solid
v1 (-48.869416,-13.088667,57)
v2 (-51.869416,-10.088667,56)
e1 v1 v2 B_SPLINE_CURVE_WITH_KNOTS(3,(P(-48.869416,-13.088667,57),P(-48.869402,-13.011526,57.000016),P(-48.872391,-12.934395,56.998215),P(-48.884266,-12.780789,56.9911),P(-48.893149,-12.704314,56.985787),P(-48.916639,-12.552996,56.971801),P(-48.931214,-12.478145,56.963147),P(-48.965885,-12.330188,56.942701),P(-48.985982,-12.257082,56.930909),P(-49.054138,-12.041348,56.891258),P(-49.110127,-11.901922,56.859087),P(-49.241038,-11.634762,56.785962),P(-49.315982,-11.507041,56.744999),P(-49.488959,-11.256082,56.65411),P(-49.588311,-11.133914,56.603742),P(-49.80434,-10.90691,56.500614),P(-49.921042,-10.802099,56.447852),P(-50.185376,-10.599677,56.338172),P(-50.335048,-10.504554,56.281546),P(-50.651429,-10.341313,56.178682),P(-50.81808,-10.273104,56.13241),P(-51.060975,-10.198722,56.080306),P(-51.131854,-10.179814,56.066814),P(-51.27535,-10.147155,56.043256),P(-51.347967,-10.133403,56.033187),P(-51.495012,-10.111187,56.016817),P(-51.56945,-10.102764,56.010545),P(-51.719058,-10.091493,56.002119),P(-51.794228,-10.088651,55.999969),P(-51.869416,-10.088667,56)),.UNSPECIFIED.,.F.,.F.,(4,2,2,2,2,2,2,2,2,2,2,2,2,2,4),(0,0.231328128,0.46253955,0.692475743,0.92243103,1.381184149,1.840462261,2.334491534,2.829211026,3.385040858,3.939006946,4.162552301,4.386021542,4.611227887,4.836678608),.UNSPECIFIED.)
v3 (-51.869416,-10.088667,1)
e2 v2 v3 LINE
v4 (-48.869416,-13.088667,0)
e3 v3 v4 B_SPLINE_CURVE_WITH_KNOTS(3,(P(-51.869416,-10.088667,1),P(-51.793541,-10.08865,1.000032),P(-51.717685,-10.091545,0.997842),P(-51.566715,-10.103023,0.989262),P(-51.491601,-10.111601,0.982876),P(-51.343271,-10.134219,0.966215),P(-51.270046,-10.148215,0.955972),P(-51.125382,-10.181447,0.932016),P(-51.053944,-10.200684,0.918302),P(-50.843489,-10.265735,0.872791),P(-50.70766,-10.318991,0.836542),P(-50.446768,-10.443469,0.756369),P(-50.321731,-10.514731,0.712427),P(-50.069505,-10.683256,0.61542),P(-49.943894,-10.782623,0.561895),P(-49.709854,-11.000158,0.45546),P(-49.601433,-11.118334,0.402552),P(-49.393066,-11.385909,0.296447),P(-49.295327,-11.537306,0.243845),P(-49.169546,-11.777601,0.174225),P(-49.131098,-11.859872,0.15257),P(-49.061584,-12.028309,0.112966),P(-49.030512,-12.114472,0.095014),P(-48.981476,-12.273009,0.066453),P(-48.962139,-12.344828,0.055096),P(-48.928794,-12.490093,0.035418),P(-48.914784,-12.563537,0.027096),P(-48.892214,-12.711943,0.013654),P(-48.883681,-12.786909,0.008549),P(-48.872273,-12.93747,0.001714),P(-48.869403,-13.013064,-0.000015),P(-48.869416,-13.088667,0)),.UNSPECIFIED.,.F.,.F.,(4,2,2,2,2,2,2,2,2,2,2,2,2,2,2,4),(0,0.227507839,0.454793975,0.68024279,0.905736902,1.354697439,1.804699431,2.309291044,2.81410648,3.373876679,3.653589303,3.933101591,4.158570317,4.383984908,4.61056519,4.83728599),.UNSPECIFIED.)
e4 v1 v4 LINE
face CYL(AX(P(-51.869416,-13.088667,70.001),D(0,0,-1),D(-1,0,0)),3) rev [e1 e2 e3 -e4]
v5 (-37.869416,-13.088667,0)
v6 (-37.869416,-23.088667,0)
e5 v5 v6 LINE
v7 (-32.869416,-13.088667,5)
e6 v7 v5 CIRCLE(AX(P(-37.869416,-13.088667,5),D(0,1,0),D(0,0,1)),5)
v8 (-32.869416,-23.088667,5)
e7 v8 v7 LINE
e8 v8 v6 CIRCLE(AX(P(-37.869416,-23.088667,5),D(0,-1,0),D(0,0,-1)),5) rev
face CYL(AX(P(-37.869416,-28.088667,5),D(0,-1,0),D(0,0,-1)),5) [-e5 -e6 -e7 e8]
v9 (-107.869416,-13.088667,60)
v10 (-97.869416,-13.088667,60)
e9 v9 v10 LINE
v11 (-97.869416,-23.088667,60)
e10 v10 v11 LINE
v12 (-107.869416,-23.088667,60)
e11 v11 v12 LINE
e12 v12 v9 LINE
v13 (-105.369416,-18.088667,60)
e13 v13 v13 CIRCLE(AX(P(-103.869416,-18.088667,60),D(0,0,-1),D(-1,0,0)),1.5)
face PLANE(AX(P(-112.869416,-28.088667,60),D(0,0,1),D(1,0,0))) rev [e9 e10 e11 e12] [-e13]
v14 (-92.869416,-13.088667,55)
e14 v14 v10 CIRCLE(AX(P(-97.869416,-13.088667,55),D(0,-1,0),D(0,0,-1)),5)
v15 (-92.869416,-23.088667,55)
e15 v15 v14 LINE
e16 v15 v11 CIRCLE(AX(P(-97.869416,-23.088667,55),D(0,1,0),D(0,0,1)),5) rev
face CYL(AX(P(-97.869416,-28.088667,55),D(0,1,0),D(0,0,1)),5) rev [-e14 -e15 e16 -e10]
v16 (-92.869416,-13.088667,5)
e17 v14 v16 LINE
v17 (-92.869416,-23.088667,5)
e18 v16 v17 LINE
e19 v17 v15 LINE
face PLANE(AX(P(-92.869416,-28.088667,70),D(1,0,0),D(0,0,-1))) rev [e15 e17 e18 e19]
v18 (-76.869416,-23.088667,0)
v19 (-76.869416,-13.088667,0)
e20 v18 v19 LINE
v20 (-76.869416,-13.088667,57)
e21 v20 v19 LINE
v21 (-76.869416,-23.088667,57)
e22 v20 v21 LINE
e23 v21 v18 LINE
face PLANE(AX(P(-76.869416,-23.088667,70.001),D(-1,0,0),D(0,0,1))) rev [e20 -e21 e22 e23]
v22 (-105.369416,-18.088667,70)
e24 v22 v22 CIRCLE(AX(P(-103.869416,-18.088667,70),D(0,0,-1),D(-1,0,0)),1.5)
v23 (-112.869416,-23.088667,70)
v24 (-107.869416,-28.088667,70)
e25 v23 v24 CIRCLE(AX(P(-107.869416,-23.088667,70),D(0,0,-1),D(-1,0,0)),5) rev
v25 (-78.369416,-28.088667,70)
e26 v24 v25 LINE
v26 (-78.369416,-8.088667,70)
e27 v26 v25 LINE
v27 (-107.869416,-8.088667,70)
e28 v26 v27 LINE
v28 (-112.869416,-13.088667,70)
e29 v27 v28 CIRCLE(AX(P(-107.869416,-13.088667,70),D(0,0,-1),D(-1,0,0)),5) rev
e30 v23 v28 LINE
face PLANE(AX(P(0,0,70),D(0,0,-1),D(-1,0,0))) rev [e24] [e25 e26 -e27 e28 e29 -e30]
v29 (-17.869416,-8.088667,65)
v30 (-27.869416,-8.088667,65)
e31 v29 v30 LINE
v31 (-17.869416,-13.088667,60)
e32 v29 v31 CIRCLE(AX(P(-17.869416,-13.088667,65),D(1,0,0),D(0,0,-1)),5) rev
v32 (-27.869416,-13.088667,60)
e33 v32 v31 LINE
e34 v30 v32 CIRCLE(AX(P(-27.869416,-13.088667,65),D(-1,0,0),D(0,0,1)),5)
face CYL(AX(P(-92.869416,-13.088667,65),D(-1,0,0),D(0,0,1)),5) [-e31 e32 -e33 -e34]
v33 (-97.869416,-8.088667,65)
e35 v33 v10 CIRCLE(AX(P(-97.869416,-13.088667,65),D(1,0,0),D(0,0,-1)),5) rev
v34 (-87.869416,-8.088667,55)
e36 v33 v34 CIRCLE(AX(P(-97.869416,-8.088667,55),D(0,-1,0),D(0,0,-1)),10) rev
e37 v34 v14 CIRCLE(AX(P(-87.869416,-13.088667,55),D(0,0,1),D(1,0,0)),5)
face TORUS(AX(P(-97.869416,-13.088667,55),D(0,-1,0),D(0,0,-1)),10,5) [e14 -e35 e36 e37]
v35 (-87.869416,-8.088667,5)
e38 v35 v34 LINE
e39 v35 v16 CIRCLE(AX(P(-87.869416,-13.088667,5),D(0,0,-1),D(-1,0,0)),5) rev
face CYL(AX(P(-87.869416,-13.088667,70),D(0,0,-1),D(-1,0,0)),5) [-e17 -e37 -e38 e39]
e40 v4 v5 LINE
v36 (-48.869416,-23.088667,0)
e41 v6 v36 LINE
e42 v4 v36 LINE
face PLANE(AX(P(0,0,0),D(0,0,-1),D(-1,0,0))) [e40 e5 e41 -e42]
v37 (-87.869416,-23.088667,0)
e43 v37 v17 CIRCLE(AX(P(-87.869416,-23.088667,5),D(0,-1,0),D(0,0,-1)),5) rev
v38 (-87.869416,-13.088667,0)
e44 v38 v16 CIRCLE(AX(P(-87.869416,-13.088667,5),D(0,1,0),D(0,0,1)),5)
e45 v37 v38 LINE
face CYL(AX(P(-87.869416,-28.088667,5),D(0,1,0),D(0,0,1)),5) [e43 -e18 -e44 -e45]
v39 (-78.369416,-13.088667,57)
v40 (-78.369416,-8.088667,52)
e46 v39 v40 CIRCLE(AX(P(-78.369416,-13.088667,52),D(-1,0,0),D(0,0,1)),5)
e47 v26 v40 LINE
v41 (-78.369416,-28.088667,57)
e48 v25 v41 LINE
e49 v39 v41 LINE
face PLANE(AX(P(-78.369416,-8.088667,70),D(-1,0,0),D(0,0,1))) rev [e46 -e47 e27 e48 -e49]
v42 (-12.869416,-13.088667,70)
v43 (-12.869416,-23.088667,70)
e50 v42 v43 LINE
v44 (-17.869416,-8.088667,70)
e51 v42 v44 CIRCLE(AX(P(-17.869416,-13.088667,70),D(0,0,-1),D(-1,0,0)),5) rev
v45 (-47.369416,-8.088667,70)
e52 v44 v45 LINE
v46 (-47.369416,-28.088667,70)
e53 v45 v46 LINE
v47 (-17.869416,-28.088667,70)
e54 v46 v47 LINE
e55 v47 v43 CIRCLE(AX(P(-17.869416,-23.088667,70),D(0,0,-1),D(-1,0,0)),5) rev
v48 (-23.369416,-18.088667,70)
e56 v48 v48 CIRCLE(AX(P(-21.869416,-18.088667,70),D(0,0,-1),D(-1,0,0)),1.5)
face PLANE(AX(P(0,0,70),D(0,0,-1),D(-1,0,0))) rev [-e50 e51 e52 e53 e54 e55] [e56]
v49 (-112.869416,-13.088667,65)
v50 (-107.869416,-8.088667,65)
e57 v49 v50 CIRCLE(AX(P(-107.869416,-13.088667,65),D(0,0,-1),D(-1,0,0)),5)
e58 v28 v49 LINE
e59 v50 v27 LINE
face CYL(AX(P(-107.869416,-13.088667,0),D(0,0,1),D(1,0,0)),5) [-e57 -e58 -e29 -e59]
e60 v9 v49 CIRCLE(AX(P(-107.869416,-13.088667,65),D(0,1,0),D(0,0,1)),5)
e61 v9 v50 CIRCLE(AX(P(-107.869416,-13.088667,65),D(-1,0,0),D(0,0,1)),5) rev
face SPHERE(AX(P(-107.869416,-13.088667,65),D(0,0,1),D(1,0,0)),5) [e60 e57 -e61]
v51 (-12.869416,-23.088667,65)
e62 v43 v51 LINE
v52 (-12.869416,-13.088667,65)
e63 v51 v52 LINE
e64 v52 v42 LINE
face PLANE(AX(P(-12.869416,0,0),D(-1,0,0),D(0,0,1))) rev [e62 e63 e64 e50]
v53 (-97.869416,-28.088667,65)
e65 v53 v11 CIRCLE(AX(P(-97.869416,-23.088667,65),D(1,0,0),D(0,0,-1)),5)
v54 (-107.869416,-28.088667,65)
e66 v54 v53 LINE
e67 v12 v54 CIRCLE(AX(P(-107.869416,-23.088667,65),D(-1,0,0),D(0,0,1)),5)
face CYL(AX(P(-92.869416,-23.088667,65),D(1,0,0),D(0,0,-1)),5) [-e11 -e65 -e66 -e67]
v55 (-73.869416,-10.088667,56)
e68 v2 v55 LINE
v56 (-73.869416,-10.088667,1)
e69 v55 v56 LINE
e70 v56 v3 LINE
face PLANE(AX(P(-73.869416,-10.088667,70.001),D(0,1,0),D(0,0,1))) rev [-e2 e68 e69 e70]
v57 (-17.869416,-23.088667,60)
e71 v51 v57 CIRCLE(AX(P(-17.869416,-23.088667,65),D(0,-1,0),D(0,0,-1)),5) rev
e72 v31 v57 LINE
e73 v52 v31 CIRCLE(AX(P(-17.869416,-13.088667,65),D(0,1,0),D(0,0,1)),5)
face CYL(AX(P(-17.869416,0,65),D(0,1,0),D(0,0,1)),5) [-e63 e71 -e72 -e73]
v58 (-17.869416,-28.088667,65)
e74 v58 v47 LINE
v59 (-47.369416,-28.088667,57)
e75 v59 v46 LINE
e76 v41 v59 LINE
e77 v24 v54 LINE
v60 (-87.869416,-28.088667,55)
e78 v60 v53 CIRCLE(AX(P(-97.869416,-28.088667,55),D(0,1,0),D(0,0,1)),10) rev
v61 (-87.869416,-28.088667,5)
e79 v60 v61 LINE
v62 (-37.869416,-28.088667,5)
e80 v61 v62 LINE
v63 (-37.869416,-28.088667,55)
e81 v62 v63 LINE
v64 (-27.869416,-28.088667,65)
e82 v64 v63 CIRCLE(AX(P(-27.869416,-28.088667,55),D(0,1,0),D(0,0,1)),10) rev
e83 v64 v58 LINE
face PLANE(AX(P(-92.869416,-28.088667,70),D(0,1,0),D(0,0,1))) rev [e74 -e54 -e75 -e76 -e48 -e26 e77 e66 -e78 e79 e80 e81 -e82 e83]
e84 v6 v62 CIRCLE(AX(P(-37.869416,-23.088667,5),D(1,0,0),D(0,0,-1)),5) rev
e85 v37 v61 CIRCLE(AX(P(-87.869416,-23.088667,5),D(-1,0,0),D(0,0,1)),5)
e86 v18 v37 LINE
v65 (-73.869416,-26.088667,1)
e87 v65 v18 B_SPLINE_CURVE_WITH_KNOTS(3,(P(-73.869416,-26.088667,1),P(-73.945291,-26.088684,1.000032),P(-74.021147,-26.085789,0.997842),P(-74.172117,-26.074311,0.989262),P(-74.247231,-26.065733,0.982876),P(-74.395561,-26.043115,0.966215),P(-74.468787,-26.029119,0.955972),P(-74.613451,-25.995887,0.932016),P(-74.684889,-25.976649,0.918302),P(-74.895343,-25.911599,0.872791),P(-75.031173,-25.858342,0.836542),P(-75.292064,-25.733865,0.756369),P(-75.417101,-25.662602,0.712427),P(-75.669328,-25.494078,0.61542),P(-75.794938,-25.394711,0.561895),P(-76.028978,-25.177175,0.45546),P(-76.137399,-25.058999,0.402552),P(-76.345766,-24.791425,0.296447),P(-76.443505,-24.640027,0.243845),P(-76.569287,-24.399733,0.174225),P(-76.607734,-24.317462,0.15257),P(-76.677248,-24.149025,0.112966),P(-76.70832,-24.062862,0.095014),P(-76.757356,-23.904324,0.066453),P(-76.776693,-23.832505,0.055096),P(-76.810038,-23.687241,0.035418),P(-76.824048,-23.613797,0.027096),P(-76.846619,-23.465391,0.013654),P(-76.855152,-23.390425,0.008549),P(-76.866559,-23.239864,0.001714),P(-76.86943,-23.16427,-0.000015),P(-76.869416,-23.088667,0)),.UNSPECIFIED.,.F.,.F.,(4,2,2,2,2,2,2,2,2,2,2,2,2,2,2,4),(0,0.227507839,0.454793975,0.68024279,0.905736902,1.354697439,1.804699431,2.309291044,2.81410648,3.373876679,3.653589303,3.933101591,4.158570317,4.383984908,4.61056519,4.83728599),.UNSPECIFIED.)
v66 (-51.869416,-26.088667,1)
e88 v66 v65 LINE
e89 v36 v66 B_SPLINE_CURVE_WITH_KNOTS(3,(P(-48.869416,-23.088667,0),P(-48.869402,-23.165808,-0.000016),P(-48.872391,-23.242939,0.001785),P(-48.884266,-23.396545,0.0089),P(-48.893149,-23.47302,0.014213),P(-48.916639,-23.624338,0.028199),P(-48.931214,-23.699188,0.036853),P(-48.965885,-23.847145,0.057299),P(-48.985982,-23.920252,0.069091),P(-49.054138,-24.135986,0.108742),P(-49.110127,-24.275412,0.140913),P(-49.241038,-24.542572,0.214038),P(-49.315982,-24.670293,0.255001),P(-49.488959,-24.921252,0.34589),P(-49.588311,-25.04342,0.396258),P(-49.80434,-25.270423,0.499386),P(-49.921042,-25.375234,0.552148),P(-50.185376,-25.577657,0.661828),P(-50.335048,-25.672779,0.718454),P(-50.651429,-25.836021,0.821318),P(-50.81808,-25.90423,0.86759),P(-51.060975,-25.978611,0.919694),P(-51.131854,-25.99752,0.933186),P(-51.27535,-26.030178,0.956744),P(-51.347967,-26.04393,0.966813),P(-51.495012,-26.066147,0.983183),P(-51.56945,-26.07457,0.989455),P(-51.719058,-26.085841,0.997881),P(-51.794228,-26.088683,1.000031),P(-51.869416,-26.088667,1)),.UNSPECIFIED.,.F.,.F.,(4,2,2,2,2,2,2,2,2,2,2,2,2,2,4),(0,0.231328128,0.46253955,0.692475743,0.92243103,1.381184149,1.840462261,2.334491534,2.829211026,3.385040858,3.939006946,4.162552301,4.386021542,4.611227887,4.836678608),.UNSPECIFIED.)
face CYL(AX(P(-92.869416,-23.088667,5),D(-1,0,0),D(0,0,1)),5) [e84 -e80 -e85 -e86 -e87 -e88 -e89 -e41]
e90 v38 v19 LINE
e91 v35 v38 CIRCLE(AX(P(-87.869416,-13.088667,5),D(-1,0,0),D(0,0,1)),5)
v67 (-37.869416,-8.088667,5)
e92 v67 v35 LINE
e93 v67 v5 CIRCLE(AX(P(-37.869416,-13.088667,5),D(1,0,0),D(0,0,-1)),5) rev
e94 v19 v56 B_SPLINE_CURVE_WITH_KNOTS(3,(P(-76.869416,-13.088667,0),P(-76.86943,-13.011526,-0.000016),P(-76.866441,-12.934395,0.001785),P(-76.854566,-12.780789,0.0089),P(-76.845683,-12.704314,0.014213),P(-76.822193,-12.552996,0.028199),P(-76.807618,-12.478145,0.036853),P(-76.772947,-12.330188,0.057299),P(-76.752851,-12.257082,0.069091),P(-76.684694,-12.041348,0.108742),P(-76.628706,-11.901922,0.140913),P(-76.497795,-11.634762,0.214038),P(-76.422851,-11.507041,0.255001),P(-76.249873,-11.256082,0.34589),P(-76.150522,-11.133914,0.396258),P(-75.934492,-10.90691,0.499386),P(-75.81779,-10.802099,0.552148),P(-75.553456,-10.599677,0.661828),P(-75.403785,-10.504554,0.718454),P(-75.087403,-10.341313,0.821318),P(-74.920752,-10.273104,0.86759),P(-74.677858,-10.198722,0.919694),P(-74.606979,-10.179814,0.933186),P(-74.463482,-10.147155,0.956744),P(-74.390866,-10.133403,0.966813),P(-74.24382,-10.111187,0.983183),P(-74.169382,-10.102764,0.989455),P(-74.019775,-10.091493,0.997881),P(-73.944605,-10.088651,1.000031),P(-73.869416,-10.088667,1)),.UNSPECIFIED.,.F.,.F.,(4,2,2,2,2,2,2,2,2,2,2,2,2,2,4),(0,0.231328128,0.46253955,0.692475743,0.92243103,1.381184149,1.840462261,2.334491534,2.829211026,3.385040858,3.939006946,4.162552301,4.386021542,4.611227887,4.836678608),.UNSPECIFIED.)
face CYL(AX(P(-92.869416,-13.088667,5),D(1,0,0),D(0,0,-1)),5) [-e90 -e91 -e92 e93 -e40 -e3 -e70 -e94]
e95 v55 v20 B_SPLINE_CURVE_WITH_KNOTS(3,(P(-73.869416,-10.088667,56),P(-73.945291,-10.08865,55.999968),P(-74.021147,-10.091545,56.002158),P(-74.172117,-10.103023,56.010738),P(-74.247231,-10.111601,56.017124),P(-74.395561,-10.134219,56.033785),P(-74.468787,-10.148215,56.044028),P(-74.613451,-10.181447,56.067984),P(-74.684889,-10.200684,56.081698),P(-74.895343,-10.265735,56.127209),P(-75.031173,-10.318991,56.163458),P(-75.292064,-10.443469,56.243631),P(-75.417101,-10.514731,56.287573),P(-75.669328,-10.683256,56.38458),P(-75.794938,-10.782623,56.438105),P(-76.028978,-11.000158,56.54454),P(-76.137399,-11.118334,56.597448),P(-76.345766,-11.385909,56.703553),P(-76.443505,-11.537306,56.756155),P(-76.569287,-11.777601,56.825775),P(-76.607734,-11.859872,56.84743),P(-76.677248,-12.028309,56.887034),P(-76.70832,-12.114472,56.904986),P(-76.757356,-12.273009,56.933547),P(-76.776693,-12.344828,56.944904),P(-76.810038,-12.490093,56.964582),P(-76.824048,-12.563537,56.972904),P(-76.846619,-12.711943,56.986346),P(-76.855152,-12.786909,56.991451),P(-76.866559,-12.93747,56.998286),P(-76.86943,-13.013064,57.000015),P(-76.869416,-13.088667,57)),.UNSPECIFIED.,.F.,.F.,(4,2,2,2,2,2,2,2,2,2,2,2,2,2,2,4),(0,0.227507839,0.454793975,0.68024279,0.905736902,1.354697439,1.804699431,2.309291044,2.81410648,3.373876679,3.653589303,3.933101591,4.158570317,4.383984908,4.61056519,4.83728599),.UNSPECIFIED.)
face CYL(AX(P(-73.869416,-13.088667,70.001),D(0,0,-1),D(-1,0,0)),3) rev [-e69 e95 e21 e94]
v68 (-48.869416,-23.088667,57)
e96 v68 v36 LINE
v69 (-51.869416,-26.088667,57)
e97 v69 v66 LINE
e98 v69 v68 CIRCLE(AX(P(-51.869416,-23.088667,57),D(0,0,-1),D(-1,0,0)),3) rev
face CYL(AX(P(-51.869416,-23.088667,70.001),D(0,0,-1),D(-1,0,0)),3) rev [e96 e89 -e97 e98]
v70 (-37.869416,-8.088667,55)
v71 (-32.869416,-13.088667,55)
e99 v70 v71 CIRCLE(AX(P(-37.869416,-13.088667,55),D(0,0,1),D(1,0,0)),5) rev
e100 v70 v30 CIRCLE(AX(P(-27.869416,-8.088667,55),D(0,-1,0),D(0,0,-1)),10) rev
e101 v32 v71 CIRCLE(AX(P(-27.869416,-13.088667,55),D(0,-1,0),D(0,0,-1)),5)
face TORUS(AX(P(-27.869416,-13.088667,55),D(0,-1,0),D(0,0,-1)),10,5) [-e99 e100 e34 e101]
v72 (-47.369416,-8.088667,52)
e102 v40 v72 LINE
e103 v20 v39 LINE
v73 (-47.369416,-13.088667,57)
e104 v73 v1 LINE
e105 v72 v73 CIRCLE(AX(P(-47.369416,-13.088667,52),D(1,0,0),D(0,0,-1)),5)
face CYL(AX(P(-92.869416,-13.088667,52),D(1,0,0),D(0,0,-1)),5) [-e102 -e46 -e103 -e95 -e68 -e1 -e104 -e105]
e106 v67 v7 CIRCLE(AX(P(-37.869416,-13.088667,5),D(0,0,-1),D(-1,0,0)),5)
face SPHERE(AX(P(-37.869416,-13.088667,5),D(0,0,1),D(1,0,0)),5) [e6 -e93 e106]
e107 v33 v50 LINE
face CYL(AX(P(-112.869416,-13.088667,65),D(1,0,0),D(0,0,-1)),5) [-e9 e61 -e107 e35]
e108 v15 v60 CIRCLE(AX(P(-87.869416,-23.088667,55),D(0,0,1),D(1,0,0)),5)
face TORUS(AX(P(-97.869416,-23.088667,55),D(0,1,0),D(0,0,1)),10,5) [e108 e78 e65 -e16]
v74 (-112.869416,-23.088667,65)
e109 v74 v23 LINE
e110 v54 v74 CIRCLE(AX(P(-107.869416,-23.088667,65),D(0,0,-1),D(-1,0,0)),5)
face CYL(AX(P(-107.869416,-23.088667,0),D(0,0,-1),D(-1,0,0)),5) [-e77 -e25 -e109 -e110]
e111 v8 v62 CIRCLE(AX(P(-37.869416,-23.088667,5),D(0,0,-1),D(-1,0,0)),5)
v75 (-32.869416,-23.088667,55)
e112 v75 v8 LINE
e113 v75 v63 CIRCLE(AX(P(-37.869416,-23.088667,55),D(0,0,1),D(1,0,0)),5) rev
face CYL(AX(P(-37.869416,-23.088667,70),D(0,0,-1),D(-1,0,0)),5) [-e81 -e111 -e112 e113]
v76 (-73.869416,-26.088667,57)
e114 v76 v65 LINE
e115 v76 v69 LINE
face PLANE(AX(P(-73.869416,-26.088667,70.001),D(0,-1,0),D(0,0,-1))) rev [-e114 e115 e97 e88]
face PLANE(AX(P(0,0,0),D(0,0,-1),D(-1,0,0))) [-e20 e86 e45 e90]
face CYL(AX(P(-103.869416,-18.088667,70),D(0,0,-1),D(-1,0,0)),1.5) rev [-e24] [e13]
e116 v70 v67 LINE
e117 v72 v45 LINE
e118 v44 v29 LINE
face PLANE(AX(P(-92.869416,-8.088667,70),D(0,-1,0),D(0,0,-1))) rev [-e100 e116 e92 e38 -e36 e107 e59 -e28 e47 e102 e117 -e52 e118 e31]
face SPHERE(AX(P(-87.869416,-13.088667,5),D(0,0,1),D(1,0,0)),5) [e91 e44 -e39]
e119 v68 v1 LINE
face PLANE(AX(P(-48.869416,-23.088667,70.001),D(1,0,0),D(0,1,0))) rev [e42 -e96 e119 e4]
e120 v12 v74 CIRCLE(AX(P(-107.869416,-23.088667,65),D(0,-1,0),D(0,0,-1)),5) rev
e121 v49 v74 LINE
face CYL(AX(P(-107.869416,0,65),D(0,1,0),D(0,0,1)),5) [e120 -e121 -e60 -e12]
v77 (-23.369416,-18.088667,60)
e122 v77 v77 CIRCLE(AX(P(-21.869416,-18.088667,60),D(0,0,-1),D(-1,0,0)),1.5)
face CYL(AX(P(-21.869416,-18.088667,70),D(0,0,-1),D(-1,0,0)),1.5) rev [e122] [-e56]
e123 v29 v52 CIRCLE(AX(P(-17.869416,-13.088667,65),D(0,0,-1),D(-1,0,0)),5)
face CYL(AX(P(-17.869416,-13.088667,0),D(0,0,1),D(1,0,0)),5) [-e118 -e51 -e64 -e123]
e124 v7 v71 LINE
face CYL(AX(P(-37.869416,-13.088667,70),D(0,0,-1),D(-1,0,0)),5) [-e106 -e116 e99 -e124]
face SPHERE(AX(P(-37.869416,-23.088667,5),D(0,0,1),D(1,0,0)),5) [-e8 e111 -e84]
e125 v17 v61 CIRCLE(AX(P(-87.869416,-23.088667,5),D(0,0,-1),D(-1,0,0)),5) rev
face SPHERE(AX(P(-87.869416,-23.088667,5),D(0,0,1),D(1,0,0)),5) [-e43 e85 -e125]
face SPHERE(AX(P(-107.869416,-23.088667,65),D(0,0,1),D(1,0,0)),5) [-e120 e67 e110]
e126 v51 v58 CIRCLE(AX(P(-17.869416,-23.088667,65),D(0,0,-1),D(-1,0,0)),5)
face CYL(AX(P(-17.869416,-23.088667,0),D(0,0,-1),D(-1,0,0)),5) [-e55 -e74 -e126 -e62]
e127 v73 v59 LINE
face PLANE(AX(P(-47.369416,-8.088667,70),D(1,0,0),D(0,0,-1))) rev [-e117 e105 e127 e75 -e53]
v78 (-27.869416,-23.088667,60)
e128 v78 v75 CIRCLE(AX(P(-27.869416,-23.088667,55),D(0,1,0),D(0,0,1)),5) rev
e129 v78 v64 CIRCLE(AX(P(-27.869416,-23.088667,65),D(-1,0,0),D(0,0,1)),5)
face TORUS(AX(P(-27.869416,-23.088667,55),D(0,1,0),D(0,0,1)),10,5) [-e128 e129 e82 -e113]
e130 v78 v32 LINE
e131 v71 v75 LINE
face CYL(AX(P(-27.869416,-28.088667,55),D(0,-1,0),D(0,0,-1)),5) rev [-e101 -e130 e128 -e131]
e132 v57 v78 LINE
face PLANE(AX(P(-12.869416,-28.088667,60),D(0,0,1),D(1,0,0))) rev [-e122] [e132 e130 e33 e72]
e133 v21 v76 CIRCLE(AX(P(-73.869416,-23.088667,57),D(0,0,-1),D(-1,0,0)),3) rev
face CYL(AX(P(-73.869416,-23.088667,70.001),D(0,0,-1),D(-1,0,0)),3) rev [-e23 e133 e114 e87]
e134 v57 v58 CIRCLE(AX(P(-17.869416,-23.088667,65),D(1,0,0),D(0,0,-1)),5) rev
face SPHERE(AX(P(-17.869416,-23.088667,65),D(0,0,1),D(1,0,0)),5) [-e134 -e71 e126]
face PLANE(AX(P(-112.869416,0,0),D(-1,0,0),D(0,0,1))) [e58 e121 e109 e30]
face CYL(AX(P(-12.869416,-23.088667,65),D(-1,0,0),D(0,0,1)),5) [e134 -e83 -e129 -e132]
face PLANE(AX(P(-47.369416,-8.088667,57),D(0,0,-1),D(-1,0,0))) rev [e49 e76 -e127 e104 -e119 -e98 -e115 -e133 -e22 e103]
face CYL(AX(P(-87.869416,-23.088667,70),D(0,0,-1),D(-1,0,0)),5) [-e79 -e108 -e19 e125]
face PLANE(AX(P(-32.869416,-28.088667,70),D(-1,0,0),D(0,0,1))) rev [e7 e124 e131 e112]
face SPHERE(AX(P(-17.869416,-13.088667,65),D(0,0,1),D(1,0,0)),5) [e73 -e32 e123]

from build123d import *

# Parameters (mm, degrees)
ESBO_O1_W                = 60
ESBO_O1_H                = 20
RESSALTO_EXTRUS_O1_DEPTH = 70
ESBO_O4_W                = 31
ESBO_O4_H                = 13
CORTE_EXTRUS_O2_DEPTH    = 119.003086654
ESBO_O6_W                = 10
ESBO_O6_H                = 20
RESSALTO_EXTRUS_O2_DEPTH = 20
ESBO_O5_W                = 10
ESBO_O5_H                = 20
RESSALTO_EXTRUS_O3_DEPTH = 20
CORTE_EXTRUS_O4_REACH    = 137.752
FILETE1_R                = 5
ESBO_O8_R                = 1.5
CORTE_EXTRUS_O5_DEPTH    = 131.875812627
FILETE2_R                = 5


with BuildPart() as part:
    # Esboço1 → Ressalto-extrusão1 (new body)
    with BuildSketch(Plane.XY):
        with Locations((-62.86941617, -18.088666872)):
            Rectangle(ESBO_O1_W, ESBO_O1_H)
    extrude(amount=RESSALTO_EXTRUS_O1_DEPTH)

    # Esboço4 → Corte-extrusão2 (cut, through all)
    with BuildSketch(Plane(origin=(0, -28.088666872, 0), x_dir=(-1, 0, 0), z_dir=(0, -1, 0))):
        with Locations((62.86941617, -63.5)):
            Rectangle(ESBO_O4_W, ESBO_O4_H)
    extrude(amount=-CORTE_EXTRUS_O2_DEPTH, mode=Mode.SUBTRACT)

    # Esboço6 → Ressalto-extrusão2 (add)
    with BuildSketch(Plane.ZY.offset(92.86941617)):
        with Locations((65, -18.088666872)):
            Rectangle(ESBO_O6_W, ESBO_O6_H)
    extrude(amount=RESSALTO_EXTRUS_O2_DEPTH)

    # Esboço5 → Ressalto-extrusão3 (add)
    with BuildSketch(Plane(origin=(-32.86941617, 0, 0), x_dir=(0, 0, -1), z_dir=(1, 0, 0))):
        with Locations((-65, -18.088666872)):
            Rectangle(ESBO_O5_W, ESBO_O5_H)
    extrude(amount=RESSALTO_EXTRUS_O3_DEPTH)

    # Esboço7 → Corte-extrusão4 (cut, up to next)
    with BuildSketch(Plane(origin=(0, 0, 0), x_dir=(-1, 0, 0), z_dir=(0, 0, -1)), mode=Mode.PRIVATE) as corte_extrus_o4_sk1:
        with BuildLine():
            Line((73.86941617, -26.088666872), (51.86941617, -26.088666872))
            ThreePointArc((51.86941617, -26.088666872), (49.748095827, -25.209987216), (48.86941617, -23.088666872))
            Line((48.86941617, -23.088666872), (48.86941617, -13.088666872))
            ThreePointArc((48.86941617, -13.088666872), (49.748095827, -10.967346529), (51.86941617, -10.088666872))
            Line((51.86941617, -10.088666872), (73.86941617, -10.088666872))
            ThreePointArc((73.86941617, -10.088666872), (75.990736514, -10.967346529), (76.86941617, -13.088666872))
            Line((76.86941617, -13.088666872), (76.86941617, -23.088666872))
            ThreePointArc((76.86941617, -23.088666872), (75.990736514, -25.209987216), (73.86941617, -26.088666872))
        make_face()
    corte_extrus_o4_tool1 = extrude(corte_extrus_o4_sk1.sketch, amount=-CORTE_EXTRUS_O4_REACH, mode=Mode.PRIVATE) & part.part
    add(corte_extrus_o4_tool1.solids().sort_by_distance((-62.869416, -18.088667, 0))[0], mode=Mode.SUBTRACT)

    # Filete1
    # the kernel refuses this fillet: 5 mm, written as the material it adds along each edge
    with BuildSketch(Plane(origin=(-92.86941617, -28.088666872, 60), x_dir=(0, 0, -1), z_dir=(0, 1, 0)), Plane(origin=(-32.86941617, -28.088666872, 60), x_dir=(1, 0, 0), z_dir=(0, 1, 0))) as filete1_piece_1:
        with BuildLine():
            CenterArc((FILETE1_R, FILETE1_R), FILETE1_R, 180, 90)
            Line((0, FILETE1_R), (0, 0))
            Line((0, 0), (FILETE1_R, 0))
        make_face()
    extrude(amount=20)
    # the kernel refuses this fillet: 5 mm, written as the material it takes off along each edge
    with BuildSketch(Plane(origin=(-12.86941617, -8.088666872, 47.5), x_dir=(0, -1, 0), z_dir=(0, 0, 1)), Plane(origin=(-112.86941617, -28.088666872, 82.5), x_dir=(1, 0, 0), z_dir=(0, 0, -1))) as filete1_2_piece_1:
        with BuildLine():
            CenterArc((FILETE1_R, -FILETE1_R), FILETE1_R, 90, 90)
            Line((0, -FILETE1_R), (0, 0))
            Line((0, 0), (FILETE1_R, 0))
        make_face()
    extrude(amount=35, mode=Mode.SUBTRACT)
    with BuildSketch(Plane(origin=(-112.86941617, -8.088666872, 47.5), x_dir=(0, -1, 0), z_dir=(0, 0, 1)), Plane(origin=(-12.86941617, -28.088666872, 82.5), x_dir=(-1, 0, 0), z_dir=(0, 0, -1))) as filete1_2_piece_2:
        with BuildLine():
            CenterArc((FILETE1_R, FILETE1_R), FILETE1_R, 180, 90)
            Line((0, FILETE1_R), (0, 0))
            Line((0, 0), (FILETE1_R, 0))
        make_face()
    extrude(amount=35, mode=Mode.SUBTRACT)
    with BuildSketch(Plane(origin=(-112.86941617, -40.588666872, 60), x_dir=(1, 0, 0), z_dir=(0, 1, 0)), Plane(origin=(-12.86941617, -40.588666872, 60), x_dir=(0, 0, 1), z_dir=(0, 1, 0))) as filete1_2_piece_3:
        with BuildLine():
            CenterArc((FILETE1_R, -FILETE1_R), FILETE1_R, 90, 90)
            Line((0, -FILETE1_R), (0, 0))
            Line((0, 0), (FILETE1_R, 0))
        make_face()
    extrude(amount=45, mode=Mode.SUBTRACT)
    with BuildSketch(Plane(origin=(-105.36941617, -28.088666872, 0), x_dir=(0, 0, 1), z_dir=(1, 0, 0))) as filete1_2_piece_4:
        with BuildLine():
            CenterArc((FILETE1_R, -FILETE1_R), FILETE1_R, 90, 90)
            Line((0, -FILETE1_R), (0, 0))
            Line((0, 0), (FILETE1_R, 0))
        make_face()
    extrude(amount=85, mode=Mode.SUBTRACT)
    with BuildSketch(Plane(origin=(-92.86941617, 4.411333128, 0), x_dir=(1, 0, 0), z_dir=(0, -1, 0)), Plane(origin=(-32.86941617, -40.588666872, 0), x_dir=(-1, 0, 0), z_dir=(0, 1, 0))) as filete1_2_piece_5:
        with BuildLine():
            CenterArc((FILETE1_R, FILETE1_R), FILETE1_R, 180, 90)
            Line((0, FILETE1_R), (0, 0))
            Line((0, 0), (FILETE1_R, 0))
        make_face()
    extrude(amount=45, mode=Mode.SUBTRACT)
    with BuildSketch(Plane(origin=(-20.36941617, -8.088666872, 0), x_dir=(0, -1, 0), z_dir=(-1, 0, 0))) as filete1_2_piece_6:
        with BuildLine():
            CenterArc((FILETE1_R, FILETE1_R), FILETE1_R, 180, 90)
            Line((0, FILETE1_R), (0, 0))
            Line((0, 0), (FILETE1_R, 0))
        make_face()
    extrude(amount=85, mode=Mode.SUBTRACT)
    # the kernel refuses this fillet: 5 mm, written as the material it takes off along each edge
    with BuildSketch(Plane(origin=(-87.86941617, -23.088666872, 5), x_dir=(-1, 0, 0), z_dir=(0, -1, 0))) as filete1_3_piece_1_section:
        Polygon((0, 0), (FILETE1_R, 0), (FILETE1_R, FILETE1_R), (0, FILETE1_R), align=None)
    filete1_3_piece_1 = extrude(amount=FILETE1_R, mode=Mode.PRIVATE)
    filete1_3_piece_1 = filete1_3_piece_1 - Plane(origin=(-87.86941617, -23.088666872, 5), x_dir=(0.7071067811865475, 0, 0.7071067811865475), z_dir=(0, -1, 0)) * Sphere(FILETE1_R, mode=Mode.PRIVATE)
    add(filete1_3_piece_1, mode=Mode.SUBTRACT)
    with BuildSketch(Plane(origin=(-87.86941617, -13.088666872, 5), x_dir=(0, 1, 0), z_dir=(-1, 0, 0))) as filete1_3_piece_2_section:
        Polygon((0, 0), (FILETE1_R, 0), (FILETE1_R, FILETE1_R), (0, FILETE1_R), align=None)
    filete1_3_piece_2 = extrude(amount=FILETE1_R, mode=Mode.PRIVATE)
    filete1_3_piece_2 = filete1_3_piece_2 - Plane(origin=(-87.86941617, -13.088666872, 5), x_dir=(0, -0.7071067811865475, 0.7071067811865475), z_dir=(-1, 0, 0)) * Sphere(FILETE1_R, mode=Mode.PRIVATE)
    add(filete1_3_piece_2, mode=Mode.SUBTRACT)
    with BuildSketch(Plane(origin=(-37.86941617, -13.088666872, 5), x_dir=(0, 1, 0), z_dir=(1, 0, 0))) as filete1_3_piece_3_section:
        Polygon((0, 0), (FILETE1_R, 0), (FILETE1_R, -FILETE1_R), (0, -FILETE1_R), align=None)
    filete1_3_piece_3 = extrude(amount=FILETE1_R, mode=Mode.PRIVATE)
    filete1_3_piece_3 = filete1_3_piece_3 - Plane(origin=(-37.86941617, -13.088666872, 5), x_dir=(0, -0.7071067811865475, 0.7071067811865475), z_dir=(1, 0, 0)) * Sphere(FILETE1_R, mode=Mode.PRIVATE)
    add(filete1_3_piece_3, mode=Mode.SUBTRACT)
    with BuildSketch(Plane(origin=(-37.86941617, -23.088666872, 5), x_dir=(1, 0, 0), z_dir=(0, -1, 0))) as filete1_3_piece_4_section:
        Polygon((0, 0), (FILETE1_R, 0), (FILETE1_R, -FILETE1_R), (0, -FILETE1_R), align=None)
    filete1_3_piece_4 = extrude(amount=FILETE1_R, mode=Mode.PRIVATE)
    filete1_3_piece_4 = filete1_3_piece_4 - Plane(origin=(-37.86941617, -23.088666872, 5), x_dir=(-0.7071067811865475, 0, 0.7071067811865475), z_dir=(0, -1, 0)) * Sphere(FILETE1_R, mode=Mode.PRIVATE)
    add(filete1_3_piece_4, mode=Mode.SUBTRACT)
    with BuildSketch(Plane(origin=(-107.86941617, -23.088666872, 65), x_dir=(0, 0, -1), z_dir=(0, -1, 0))) as filete1_3_piece_5_section:
        Polygon((0, 0), (FILETE1_R, 0), (FILETE1_R, -FILETE1_R), (0, -FILETE1_R), align=None)
    filete1_3_piece_5 = extrude(amount=FILETE1_R, mode=Mode.PRIVATE)
    filete1_3_piece_5 = filete1_3_piece_5 - Plane(origin=(-107.86941617, -23.088666872, 65), x_dir=(0.7071067811865475, 0, 0.7071067811865475), z_dir=(0, -1, 0)) * Sphere(FILETE1_R, mode=Mode.PRIVATE)
    add(filete1_3_piece_5, mode=Mode.SUBTRACT)
    with BuildSketch(Plane(origin=(-17.86941617, -13.088666872, 65), x_dir=(0, 1, 0), z_dir=(0, 0, -1))) as filete1_3_piece_6_section:
        Polygon((0, 0), (FILETE1_R, 0), (FILETE1_R, FILETE1_R), (0, FILETE1_R), align=None)
    filete1_3_piece_6 = extrude(amount=FILETE1_R, mode=Mode.PRIVATE)
    filete1_3_piece_6 = filete1_3_piece_6 - Plane(origin=(-17.86941617, -13.088666872, 65), x_dir=(-0.7071067811865475, -0.7071067811865475, 0), z_dir=(0, 0, -1)) * Sphere(FILETE1_R, mode=Mode.PRIVATE)
    add(filete1_3_piece_6, mode=Mode.SUBTRACT)
    with BuildSketch(Plane(origin=(-17.86941617, -23.088666872, 65), x_dir=(0, 0, -1), z_dir=(0, -1, 0))) as filete1_3_piece_7_section:
        Polygon((0, 0), (FILETE1_R, 0), (FILETE1_R, FILETE1_R), (0, FILETE1_R), align=None)
    filete1_3_piece_7 = extrude(amount=FILETE1_R, mode=Mode.PRIVATE)
    filete1_3_piece_7 = filete1_3_piece_7 - Plane(origin=(-17.86941617, -23.088666872, 65), x_dir=(-0.7071067811865475, 0, 0.7071067811865475), z_dir=(0, -1, 0)) * Sphere(FILETE1_R, mode=Mode.PRIVATE)
    add(filete1_3_piece_7, mode=Mode.SUBTRACT)
    with BuildSketch(Plane(origin=(-107.86941617, -13.088666872, 65), x_dir=(0, 1, 0), z_dir=(0, 0, -1))) as filete1_3_piece_8_section:
        Polygon((0, 0), (FILETE1_R, 0), (FILETE1_R, -FILETE1_R), (0, -FILETE1_R), align=None)
    filete1_3_piece_8 = extrude(amount=FILETE1_R, mode=Mode.PRIVATE)
    filete1_3_piece_8 = filete1_3_piece_8 - Plane(origin=(-107.86941617, -13.088666872, 65), x_dir=(0.7071067811865475, -0.7071067811865475, 0), z_dir=(0, 0, -1)) * Sphere(FILETE1_R, mode=Mode.PRIVATE)
    add(filete1_3_piece_8, mode=Mode.SUBTRACT)
    with BuildSketch(Plane(origin=(-97.86941617, -8.088666872, 60), x_dir=(0, -1, 0), z_dir=(-1, 0, 0)), Plane(origin=(-97.86941617, -28.088666872, 60), x_dir=(0, 0, 1), z_dir=(-1, 0, 0))) as filete1_3_piece_9:
        with BuildLine():
            CenterArc((FILETE1_R, FILETE1_R), FILETE1_R, 180, 90)
            Line((0, FILETE1_R), (0, 0))
            Line((0, 0), (FILETE1_R, 0))
        make_face()
    extrude(amount=10, mode=Mode.SUBTRACT)
    with BuildSketch(Plane(origin=(-27.86941617, -28.088666872, 60), x_dir=(0, 0, 1), z_dir=(1, 0, 0)), Plane(origin=(-27.86941617, -8.088666872, 60), x_dir=(0, -1, 0), z_dir=(1, 0, 0))) as filete1_3_piece_10:
        with BuildLine():
            CenterArc((FILETE1_R, -FILETE1_R), FILETE1_R, 90, 90)
            Line((0, -FILETE1_R), (0, 0))
            Line((0, 0), (FILETE1_R, 0))
        make_face()
    extrude(amount=10, mode=Mode.SUBTRACT)
    with BuildSketch(Plane(origin=(-32.86941617, -28.088666872, 5), x_dir=(-1, 0, 0), z_dir=(0, 0, 1)), Plane(origin=(-32.86941617, -8.088666872, 5), x_dir=(0, -1, 0), z_dir=(0, 0, 1))) as filete1_3_piece_11:
        with BuildLine():
            CenterArc((FILETE1_R, -FILETE1_R), FILETE1_R, 90, 90)
            Line((0, -FILETE1_R), (0, 0))
            Line((0, 0), (FILETE1_R, 0))
        make_face()
    extrude(amount=50, mode=Mode.SUBTRACT)
    with BuildSketch(Plane(origin=(-92.86941617, -8.088666872, 5), x_dir=(0, -1, 0), z_dir=(0, 0, 1)), Plane(origin=(-92.86941617, -28.088666872, 5), x_dir=(1, 0, 0), z_dir=(0, 0, 1))) as filete1_3_piece_12:
        with BuildLine():
            CenterArc((FILETE1_R, FILETE1_R), FILETE1_R, 180, 90)
            Line((0, FILETE1_R), (0, 0))
            Line((0, 0), (FILETE1_R, 0))
        make_face()
    extrude(amount=50, mode=Mode.SUBTRACT)
    with BuildSketch(Plane(origin=(-97.86941617, -28.088666872, 55), x_dir=(1, 0, 0), z_dir=(0, 0, -1))) as filete1_3_piece_13:
        with BuildLine():
            CenterArc((5 + FILETE1_R, -FILETE1_R), FILETE1_R, 90, 90)
            Line((5, -FILETE1_R), (5, 0))
            Line((5, 0), (5 + FILETE1_R, 0))
        make_face()
    revolve(axis=Axis((-97.86941617, -28.088666872, 55), (0, -1, 0)), revolution_arc=90, mode=Mode.SUBTRACT)
    with BuildSketch(Plane(origin=(-97.86941617, -8.088666872, 55), x_dir=(1, 0, 0), z_dir=(0, 0, -1))) as filete1_3_piece_14:
        with BuildLine():
            CenterArc((5 + FILETE1_R, FILETE1_R), FILETE1_R, 180, 90)
            Line((5 + FILETE1_R, 0), (5, 0))
            Line((5, 0), (5, FILETE1_R))
        make_face()
    revolve(axis=Axis((-97.86941617, -8.088666872, 55), (0, -1, 0)), revolution_arc=90, mode=Mode.SUBTRACT)
    with BuildSketch(Plane(origin=(-27.86941617, -8.088666872, 55), x_dir=(0, 0, 1), z_dir=(1, 0, 0))) as filete1_3_piece_15:
        with BuildLine():
            CenterArc((5 + FILETE1_R, FILETE1_R), FILETE1_R, 180, 90)
            Line((5 + FILETE1_R, 0), (5, 0))
            Line((5, 0), (5, FILETE1_R))
        make_face()
    revolve(axis=Axis((-27.86941617, -8.088666872, 55), (0, -1, 0)), revolution_arc=90, mode=Mode.SUBTRACT)
    with BuildSketch(Plane(origin=(-27.86941617, -28.088666872, 55), x_dir=(0, 0, 1), z_dir=(1, 0, 0))) as filete1_3_piece_16:
        with BuildLine():
            CenterArc((5 + FILETE1_R, -FILETE1_R), FILETE1_R, 90, 90)
            Line((5, -FILETE1_R), (5, 0))
            Line((5, 0), (5 + FILETE1_R, 0))
        make_face()
    revolve(axis=Axis((-27.86941617, -28.088666872, 55), (0, -1, 0)), revolution_arc=90, mode=Mode.SUBTRACT)

    # Esboço8 → Corte-extrusão5 (cut, through all)
    with BuildSketch(Plane(origin=(0, 0, 60), x_dir=(-1, 0, 0), z_dir=(0, 0, -1))):
        with Locations((21.86941617, -18.088666872)):
            Circle(ESBO_O8_R)
        with Locations((103.86941617, -18.088666872)):
            Circle(ESBO_O8_R)
    extrude(amount=-CORTE_EXTRUS_O5_DEPTH, mode=Mode.SUBTRACT)

    # Filete2
    # the kernel refuses this fillet: 5 mm, written as the material it takes off along each edge
    with BuildSketch(Plane(origin=(-78.36941617, -8.088666872, 57), x_dir=(0, 0, -1), z_dir=(1, 0, 0))) as filete2_piece_1:
        with BuildLine():
            CenterArc((FILETE2_R, -FILETE2_R), FILETE2_R, 90, 90)
            Line((0, -FILETE2_R), (0, 0))
            Line((0, 0), (FILETE2_R, 0))
        make_face()
    extrude(amount=31, mode=Mode.SUBTRACT)


solid = part.part
